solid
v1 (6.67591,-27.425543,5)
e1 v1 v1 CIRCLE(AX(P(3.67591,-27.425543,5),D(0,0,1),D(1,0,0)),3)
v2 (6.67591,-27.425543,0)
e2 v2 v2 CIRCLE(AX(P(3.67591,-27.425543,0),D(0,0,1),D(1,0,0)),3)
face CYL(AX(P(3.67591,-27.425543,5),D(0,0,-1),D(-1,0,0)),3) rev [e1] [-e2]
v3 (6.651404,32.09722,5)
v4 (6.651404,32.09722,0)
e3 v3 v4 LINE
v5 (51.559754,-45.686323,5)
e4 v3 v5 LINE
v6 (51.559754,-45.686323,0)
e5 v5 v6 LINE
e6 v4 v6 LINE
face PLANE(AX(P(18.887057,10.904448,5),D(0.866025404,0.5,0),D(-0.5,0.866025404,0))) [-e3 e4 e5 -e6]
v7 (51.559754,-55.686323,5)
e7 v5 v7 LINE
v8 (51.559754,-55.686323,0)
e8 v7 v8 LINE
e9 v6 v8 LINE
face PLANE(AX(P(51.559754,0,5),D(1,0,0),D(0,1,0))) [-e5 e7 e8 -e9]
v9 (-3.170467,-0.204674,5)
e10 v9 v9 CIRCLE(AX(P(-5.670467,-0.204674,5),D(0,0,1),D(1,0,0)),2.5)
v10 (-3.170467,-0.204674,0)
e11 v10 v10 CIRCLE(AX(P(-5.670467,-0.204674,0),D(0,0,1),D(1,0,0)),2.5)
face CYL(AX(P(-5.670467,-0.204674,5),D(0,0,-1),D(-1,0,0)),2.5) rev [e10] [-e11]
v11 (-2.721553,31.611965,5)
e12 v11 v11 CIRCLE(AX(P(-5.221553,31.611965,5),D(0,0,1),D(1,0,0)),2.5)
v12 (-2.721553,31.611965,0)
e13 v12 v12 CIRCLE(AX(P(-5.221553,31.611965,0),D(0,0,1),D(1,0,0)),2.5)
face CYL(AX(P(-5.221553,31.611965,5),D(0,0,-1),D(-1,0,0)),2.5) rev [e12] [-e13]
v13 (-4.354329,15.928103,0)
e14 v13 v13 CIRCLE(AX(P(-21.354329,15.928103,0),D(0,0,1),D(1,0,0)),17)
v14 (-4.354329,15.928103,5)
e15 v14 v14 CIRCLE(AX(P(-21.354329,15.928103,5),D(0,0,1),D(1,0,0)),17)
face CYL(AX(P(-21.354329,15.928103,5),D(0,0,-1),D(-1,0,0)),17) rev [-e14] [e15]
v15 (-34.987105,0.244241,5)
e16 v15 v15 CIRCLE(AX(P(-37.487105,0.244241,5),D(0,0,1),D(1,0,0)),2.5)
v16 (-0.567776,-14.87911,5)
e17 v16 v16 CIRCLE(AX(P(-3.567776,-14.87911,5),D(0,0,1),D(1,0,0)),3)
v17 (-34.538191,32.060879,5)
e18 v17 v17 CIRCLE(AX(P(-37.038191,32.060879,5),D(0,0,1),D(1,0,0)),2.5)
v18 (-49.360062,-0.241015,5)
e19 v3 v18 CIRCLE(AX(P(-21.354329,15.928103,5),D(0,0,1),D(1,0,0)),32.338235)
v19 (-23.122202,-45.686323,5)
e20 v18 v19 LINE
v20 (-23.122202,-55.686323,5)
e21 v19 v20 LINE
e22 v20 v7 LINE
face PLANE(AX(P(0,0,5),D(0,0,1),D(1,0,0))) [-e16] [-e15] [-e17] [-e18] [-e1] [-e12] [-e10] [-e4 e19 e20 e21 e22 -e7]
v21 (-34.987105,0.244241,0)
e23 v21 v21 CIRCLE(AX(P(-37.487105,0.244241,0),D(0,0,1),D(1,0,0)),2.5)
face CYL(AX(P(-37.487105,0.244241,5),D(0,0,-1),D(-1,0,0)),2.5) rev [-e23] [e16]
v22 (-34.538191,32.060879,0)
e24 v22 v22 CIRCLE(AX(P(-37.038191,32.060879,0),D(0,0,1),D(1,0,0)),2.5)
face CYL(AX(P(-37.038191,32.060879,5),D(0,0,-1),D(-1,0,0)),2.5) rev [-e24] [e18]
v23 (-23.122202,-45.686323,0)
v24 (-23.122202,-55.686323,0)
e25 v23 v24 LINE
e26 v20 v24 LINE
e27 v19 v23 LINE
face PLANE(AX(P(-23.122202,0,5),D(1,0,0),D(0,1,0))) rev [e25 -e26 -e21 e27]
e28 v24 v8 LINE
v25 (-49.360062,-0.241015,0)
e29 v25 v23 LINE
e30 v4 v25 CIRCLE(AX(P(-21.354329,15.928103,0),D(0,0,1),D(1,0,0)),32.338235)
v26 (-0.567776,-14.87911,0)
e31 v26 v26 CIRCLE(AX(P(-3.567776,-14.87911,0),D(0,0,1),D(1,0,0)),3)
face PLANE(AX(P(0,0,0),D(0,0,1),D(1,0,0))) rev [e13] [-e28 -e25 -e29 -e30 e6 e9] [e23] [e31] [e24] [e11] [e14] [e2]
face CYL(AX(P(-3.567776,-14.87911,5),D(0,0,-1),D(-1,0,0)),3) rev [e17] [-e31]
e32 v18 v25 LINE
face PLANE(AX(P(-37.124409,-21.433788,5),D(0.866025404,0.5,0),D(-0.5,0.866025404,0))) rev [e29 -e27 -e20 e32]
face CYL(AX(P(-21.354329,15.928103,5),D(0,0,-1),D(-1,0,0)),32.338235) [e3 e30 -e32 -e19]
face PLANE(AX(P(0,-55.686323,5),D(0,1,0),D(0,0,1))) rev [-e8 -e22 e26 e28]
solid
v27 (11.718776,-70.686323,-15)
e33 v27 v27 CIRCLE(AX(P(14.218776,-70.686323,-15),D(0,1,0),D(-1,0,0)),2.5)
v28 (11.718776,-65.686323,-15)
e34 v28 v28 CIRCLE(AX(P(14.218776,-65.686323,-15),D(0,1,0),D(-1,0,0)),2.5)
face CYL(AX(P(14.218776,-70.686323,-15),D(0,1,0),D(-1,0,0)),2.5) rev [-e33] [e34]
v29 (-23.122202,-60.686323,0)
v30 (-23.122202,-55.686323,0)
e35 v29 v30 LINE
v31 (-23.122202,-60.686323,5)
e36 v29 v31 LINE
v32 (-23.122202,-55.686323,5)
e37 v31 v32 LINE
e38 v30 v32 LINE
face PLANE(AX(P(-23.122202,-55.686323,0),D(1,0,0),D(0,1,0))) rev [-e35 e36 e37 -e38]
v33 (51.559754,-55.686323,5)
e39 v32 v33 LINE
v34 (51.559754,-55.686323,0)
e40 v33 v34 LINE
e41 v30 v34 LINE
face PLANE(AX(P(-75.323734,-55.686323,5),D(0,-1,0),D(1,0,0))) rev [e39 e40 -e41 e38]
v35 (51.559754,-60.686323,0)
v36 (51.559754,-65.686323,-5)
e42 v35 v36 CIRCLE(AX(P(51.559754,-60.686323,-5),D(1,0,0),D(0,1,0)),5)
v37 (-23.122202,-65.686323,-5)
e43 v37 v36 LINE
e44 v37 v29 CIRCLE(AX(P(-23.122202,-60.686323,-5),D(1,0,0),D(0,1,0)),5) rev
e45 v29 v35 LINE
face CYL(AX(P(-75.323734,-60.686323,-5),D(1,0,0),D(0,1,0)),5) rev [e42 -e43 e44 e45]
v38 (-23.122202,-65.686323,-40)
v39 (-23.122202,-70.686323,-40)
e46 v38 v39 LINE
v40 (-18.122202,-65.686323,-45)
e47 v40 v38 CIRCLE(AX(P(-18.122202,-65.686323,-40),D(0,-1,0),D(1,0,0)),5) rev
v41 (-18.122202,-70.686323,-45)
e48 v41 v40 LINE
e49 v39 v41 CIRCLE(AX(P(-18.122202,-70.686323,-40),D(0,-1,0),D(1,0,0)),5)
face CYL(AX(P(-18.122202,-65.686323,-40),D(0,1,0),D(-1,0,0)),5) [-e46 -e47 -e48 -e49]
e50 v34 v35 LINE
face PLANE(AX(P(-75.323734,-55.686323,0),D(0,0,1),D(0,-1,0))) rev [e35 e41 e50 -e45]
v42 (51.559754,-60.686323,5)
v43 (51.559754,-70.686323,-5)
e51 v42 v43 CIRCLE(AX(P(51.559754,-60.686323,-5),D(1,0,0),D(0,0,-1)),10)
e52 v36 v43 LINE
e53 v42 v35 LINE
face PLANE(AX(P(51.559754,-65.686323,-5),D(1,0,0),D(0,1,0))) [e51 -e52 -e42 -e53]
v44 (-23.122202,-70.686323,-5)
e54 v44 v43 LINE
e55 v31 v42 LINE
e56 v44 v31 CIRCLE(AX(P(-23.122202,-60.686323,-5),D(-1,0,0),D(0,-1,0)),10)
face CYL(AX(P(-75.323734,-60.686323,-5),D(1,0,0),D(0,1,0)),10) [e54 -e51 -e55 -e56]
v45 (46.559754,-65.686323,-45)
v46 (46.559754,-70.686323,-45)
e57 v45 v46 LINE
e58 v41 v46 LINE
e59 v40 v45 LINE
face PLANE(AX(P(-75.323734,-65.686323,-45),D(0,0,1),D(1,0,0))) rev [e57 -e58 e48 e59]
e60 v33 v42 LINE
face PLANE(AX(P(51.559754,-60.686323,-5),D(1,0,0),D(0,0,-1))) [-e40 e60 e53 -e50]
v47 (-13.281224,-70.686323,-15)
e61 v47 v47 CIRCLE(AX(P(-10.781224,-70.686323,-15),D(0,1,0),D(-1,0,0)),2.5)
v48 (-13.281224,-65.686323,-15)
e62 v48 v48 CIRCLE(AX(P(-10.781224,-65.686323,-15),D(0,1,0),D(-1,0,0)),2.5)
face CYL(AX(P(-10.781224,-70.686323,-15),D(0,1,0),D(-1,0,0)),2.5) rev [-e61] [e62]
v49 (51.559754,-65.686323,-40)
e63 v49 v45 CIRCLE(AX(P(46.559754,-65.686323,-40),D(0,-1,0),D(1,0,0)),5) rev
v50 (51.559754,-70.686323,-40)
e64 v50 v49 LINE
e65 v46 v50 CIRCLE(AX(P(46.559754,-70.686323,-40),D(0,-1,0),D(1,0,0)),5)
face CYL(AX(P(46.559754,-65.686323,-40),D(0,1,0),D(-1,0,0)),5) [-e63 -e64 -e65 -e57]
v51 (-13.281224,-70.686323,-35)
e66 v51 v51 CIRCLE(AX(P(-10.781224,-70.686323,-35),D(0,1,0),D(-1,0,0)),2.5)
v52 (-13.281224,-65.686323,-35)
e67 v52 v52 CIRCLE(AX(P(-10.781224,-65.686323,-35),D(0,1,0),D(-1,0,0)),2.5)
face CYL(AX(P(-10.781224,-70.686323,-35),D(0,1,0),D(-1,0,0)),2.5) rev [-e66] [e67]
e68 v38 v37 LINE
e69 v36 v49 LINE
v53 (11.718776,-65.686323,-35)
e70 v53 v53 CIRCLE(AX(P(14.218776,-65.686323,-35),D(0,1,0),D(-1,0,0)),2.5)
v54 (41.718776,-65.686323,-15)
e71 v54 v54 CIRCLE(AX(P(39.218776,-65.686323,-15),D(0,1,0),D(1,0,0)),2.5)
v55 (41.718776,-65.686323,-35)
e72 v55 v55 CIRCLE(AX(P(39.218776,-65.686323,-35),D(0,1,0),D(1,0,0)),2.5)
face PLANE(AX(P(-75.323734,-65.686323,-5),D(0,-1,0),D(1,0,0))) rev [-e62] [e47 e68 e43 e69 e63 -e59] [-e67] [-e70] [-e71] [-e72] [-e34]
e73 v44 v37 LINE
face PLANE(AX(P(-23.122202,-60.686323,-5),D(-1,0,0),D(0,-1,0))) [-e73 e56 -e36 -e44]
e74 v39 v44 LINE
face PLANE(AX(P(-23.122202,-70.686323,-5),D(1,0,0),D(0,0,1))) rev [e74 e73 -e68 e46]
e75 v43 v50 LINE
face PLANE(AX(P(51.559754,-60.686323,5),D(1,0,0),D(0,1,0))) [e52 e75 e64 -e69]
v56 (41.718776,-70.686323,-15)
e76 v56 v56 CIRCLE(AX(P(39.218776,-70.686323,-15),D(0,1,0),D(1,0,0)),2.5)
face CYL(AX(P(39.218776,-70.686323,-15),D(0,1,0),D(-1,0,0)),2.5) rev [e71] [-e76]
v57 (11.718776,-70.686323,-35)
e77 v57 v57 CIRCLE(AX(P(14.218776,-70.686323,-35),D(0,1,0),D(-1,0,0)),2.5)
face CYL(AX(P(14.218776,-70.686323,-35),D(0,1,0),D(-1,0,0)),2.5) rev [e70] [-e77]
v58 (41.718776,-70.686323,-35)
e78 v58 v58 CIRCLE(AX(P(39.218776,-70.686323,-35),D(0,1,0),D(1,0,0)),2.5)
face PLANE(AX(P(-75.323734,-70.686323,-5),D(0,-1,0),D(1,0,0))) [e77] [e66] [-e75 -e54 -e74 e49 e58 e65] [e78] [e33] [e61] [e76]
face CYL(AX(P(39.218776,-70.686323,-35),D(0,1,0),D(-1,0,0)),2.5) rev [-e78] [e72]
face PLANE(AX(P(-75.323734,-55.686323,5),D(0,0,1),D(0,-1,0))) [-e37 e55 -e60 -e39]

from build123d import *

# Parameters (mm, degrees)
SKETCH_1_R             = 17
SKETCH_1_R_2           = 2.5
SKETCH_1_R_3           = 3
EXTRUDE_1_DEPTH        = 5
SM_BASE_FLANGE_1_DEPTH = 74.681955
SKETCH_8_R             = 2.5
CUT_EXTRUDE_1_DEPTH    = 134.765093758
FILLET_1_R             = 5


# Sheet-metal steps are written as plain solids
with BuildPart() as part:
    # Sketch 1 → 凸台-拉伸1 (new body)
    with BuildSketch(Plane.XY):
        with BuildLine():
            Line((-49.360062144, -0.241015089), (-23.122201524, -45.686322765))
            Line((-23.122201524, -45.686322765), (-23.122201524, -55.686322765))
            Line((-23.122201524, -55.686322765), (51.559753885, -55.686322765))
            Line((51.559753885, -55.686322765), (51.559753885, -45.686322765))
            Line((51.559753885, -45.686322765), (6.651404412, 32.097220205))
            ThreePointArc((6.651404412, 32.097220205), (-37.523446513, 43.933835837), (-49.360062144, -0.241015089))
        make_face()
        with Locations((-21.354328866, 15.928102558)):
            Circle(SKETCH_1_R, mode=Mode.SUBTRACT)
        with Locations((-37.038190861, 32.060878913)):
            Circle(SKETCH_1_R_2, mode=Mode.SUBTRACT)
        with Locations((-3.567776343, -14.879110103)):
            Circle(SKETCH_1_R_3, mode=Mode.SUBTRACT)
        with Locations((3.675910259, -27.425543331)):
            Circle(SKETCH_1_R_3, mode=Mode.SUBTRACT)
        with Locations((-5.221552511, 31.611964554)):
            Circle(SKETCH_1_R_2, mode=Mode.SUBTRACT)
        with Locations((-5.670466871, -0.204673796)):
            Circle(SKETCH_1_R_2, mode=Mode.SUBTRACT)
        with Locations((-37.487105221, 0.244240563)):
            Circle(SKETCH_1_R_2, mode=Mode.SUBTRACT)
    extrude(amount=EXTRUDE_1_DEPTH)


with BuildPart() as body_2:
    # 草图3 → 基体-法兰1 (new body)
    with BuildSketch(Plane(origin=(51.559753885, 0, 0), x_dir=(0, 0, -1), z_dir=(1, 0, 0))):
        with BuildLine():
            Line((0, -55.686322765), (0, -60.686322765))
            ThreePointArc((0, -60.686322765), (1.464466094, -64.221856671), (5, -65.686322765))
            Line((5, -65.686322765), (45, -65.686322765))
            Line((45, -65.686322765), (45, -70.686322765))
            Line((45, -70.686322765), (5, -70.686322765))
            ThreePointArc((5, -70.686322765), (-2.071067812, -67.757390577), (-5, -60.686322765))
            Line((-5, -60.686322765), (-5, -55.686322765))
            Line((-5, -55.686322765), (0, -55.686322765))
        make_face()
    extrude(amount=-SM_BASE_FLANGE_1_DEPTH)

    # 草图8 → 切除-拉伸1 (cut, through all)
    with BuildSketch(Plane(origin=(0, -65.686322765, 0), x_dir=(1, 0, 0), z_dir=(0, 1, 0))):
        with Locations(Location((14.21877618, 35, 0), (0, 0, 180))):
            Circle(SKETCH_8_R)
        with Locations(Location((-10.78122382, 35, 0), (0, 0, 180))):
            Circle(SKETCH_8_R)
        with Locations(Location((-10.78122382, 15, 0), (0, 0, 180))):
            Circle(SKETCH_8_R)
        with Locations(Location((14.21877618, 15, 0), (0, 0, 180))):
            Circle(SKETCH_8_R)
        with Locations((39.21877618, 15)):
            Circle(SKETCH_8_R)
        with Locations((39.21877618, 35)):
            Circle(SKETCH_8_R)
    extrude(amount=-CUT_EXTRUDE_1_DEPTH, mode=Mode.SUBTRACT)

    # 圆角1
    fillet_1_edges = [body_2.edges().sort_by_distance(p)[0] for p in [
        (-23.122201115, -68.186322765, -45),
        (51.559753885, -68.186322765, -45),
    ]]
    fillet(fillet_1_edges, radius=FILLET_1_R)


solid = Compound([part.part, body_2.part])
